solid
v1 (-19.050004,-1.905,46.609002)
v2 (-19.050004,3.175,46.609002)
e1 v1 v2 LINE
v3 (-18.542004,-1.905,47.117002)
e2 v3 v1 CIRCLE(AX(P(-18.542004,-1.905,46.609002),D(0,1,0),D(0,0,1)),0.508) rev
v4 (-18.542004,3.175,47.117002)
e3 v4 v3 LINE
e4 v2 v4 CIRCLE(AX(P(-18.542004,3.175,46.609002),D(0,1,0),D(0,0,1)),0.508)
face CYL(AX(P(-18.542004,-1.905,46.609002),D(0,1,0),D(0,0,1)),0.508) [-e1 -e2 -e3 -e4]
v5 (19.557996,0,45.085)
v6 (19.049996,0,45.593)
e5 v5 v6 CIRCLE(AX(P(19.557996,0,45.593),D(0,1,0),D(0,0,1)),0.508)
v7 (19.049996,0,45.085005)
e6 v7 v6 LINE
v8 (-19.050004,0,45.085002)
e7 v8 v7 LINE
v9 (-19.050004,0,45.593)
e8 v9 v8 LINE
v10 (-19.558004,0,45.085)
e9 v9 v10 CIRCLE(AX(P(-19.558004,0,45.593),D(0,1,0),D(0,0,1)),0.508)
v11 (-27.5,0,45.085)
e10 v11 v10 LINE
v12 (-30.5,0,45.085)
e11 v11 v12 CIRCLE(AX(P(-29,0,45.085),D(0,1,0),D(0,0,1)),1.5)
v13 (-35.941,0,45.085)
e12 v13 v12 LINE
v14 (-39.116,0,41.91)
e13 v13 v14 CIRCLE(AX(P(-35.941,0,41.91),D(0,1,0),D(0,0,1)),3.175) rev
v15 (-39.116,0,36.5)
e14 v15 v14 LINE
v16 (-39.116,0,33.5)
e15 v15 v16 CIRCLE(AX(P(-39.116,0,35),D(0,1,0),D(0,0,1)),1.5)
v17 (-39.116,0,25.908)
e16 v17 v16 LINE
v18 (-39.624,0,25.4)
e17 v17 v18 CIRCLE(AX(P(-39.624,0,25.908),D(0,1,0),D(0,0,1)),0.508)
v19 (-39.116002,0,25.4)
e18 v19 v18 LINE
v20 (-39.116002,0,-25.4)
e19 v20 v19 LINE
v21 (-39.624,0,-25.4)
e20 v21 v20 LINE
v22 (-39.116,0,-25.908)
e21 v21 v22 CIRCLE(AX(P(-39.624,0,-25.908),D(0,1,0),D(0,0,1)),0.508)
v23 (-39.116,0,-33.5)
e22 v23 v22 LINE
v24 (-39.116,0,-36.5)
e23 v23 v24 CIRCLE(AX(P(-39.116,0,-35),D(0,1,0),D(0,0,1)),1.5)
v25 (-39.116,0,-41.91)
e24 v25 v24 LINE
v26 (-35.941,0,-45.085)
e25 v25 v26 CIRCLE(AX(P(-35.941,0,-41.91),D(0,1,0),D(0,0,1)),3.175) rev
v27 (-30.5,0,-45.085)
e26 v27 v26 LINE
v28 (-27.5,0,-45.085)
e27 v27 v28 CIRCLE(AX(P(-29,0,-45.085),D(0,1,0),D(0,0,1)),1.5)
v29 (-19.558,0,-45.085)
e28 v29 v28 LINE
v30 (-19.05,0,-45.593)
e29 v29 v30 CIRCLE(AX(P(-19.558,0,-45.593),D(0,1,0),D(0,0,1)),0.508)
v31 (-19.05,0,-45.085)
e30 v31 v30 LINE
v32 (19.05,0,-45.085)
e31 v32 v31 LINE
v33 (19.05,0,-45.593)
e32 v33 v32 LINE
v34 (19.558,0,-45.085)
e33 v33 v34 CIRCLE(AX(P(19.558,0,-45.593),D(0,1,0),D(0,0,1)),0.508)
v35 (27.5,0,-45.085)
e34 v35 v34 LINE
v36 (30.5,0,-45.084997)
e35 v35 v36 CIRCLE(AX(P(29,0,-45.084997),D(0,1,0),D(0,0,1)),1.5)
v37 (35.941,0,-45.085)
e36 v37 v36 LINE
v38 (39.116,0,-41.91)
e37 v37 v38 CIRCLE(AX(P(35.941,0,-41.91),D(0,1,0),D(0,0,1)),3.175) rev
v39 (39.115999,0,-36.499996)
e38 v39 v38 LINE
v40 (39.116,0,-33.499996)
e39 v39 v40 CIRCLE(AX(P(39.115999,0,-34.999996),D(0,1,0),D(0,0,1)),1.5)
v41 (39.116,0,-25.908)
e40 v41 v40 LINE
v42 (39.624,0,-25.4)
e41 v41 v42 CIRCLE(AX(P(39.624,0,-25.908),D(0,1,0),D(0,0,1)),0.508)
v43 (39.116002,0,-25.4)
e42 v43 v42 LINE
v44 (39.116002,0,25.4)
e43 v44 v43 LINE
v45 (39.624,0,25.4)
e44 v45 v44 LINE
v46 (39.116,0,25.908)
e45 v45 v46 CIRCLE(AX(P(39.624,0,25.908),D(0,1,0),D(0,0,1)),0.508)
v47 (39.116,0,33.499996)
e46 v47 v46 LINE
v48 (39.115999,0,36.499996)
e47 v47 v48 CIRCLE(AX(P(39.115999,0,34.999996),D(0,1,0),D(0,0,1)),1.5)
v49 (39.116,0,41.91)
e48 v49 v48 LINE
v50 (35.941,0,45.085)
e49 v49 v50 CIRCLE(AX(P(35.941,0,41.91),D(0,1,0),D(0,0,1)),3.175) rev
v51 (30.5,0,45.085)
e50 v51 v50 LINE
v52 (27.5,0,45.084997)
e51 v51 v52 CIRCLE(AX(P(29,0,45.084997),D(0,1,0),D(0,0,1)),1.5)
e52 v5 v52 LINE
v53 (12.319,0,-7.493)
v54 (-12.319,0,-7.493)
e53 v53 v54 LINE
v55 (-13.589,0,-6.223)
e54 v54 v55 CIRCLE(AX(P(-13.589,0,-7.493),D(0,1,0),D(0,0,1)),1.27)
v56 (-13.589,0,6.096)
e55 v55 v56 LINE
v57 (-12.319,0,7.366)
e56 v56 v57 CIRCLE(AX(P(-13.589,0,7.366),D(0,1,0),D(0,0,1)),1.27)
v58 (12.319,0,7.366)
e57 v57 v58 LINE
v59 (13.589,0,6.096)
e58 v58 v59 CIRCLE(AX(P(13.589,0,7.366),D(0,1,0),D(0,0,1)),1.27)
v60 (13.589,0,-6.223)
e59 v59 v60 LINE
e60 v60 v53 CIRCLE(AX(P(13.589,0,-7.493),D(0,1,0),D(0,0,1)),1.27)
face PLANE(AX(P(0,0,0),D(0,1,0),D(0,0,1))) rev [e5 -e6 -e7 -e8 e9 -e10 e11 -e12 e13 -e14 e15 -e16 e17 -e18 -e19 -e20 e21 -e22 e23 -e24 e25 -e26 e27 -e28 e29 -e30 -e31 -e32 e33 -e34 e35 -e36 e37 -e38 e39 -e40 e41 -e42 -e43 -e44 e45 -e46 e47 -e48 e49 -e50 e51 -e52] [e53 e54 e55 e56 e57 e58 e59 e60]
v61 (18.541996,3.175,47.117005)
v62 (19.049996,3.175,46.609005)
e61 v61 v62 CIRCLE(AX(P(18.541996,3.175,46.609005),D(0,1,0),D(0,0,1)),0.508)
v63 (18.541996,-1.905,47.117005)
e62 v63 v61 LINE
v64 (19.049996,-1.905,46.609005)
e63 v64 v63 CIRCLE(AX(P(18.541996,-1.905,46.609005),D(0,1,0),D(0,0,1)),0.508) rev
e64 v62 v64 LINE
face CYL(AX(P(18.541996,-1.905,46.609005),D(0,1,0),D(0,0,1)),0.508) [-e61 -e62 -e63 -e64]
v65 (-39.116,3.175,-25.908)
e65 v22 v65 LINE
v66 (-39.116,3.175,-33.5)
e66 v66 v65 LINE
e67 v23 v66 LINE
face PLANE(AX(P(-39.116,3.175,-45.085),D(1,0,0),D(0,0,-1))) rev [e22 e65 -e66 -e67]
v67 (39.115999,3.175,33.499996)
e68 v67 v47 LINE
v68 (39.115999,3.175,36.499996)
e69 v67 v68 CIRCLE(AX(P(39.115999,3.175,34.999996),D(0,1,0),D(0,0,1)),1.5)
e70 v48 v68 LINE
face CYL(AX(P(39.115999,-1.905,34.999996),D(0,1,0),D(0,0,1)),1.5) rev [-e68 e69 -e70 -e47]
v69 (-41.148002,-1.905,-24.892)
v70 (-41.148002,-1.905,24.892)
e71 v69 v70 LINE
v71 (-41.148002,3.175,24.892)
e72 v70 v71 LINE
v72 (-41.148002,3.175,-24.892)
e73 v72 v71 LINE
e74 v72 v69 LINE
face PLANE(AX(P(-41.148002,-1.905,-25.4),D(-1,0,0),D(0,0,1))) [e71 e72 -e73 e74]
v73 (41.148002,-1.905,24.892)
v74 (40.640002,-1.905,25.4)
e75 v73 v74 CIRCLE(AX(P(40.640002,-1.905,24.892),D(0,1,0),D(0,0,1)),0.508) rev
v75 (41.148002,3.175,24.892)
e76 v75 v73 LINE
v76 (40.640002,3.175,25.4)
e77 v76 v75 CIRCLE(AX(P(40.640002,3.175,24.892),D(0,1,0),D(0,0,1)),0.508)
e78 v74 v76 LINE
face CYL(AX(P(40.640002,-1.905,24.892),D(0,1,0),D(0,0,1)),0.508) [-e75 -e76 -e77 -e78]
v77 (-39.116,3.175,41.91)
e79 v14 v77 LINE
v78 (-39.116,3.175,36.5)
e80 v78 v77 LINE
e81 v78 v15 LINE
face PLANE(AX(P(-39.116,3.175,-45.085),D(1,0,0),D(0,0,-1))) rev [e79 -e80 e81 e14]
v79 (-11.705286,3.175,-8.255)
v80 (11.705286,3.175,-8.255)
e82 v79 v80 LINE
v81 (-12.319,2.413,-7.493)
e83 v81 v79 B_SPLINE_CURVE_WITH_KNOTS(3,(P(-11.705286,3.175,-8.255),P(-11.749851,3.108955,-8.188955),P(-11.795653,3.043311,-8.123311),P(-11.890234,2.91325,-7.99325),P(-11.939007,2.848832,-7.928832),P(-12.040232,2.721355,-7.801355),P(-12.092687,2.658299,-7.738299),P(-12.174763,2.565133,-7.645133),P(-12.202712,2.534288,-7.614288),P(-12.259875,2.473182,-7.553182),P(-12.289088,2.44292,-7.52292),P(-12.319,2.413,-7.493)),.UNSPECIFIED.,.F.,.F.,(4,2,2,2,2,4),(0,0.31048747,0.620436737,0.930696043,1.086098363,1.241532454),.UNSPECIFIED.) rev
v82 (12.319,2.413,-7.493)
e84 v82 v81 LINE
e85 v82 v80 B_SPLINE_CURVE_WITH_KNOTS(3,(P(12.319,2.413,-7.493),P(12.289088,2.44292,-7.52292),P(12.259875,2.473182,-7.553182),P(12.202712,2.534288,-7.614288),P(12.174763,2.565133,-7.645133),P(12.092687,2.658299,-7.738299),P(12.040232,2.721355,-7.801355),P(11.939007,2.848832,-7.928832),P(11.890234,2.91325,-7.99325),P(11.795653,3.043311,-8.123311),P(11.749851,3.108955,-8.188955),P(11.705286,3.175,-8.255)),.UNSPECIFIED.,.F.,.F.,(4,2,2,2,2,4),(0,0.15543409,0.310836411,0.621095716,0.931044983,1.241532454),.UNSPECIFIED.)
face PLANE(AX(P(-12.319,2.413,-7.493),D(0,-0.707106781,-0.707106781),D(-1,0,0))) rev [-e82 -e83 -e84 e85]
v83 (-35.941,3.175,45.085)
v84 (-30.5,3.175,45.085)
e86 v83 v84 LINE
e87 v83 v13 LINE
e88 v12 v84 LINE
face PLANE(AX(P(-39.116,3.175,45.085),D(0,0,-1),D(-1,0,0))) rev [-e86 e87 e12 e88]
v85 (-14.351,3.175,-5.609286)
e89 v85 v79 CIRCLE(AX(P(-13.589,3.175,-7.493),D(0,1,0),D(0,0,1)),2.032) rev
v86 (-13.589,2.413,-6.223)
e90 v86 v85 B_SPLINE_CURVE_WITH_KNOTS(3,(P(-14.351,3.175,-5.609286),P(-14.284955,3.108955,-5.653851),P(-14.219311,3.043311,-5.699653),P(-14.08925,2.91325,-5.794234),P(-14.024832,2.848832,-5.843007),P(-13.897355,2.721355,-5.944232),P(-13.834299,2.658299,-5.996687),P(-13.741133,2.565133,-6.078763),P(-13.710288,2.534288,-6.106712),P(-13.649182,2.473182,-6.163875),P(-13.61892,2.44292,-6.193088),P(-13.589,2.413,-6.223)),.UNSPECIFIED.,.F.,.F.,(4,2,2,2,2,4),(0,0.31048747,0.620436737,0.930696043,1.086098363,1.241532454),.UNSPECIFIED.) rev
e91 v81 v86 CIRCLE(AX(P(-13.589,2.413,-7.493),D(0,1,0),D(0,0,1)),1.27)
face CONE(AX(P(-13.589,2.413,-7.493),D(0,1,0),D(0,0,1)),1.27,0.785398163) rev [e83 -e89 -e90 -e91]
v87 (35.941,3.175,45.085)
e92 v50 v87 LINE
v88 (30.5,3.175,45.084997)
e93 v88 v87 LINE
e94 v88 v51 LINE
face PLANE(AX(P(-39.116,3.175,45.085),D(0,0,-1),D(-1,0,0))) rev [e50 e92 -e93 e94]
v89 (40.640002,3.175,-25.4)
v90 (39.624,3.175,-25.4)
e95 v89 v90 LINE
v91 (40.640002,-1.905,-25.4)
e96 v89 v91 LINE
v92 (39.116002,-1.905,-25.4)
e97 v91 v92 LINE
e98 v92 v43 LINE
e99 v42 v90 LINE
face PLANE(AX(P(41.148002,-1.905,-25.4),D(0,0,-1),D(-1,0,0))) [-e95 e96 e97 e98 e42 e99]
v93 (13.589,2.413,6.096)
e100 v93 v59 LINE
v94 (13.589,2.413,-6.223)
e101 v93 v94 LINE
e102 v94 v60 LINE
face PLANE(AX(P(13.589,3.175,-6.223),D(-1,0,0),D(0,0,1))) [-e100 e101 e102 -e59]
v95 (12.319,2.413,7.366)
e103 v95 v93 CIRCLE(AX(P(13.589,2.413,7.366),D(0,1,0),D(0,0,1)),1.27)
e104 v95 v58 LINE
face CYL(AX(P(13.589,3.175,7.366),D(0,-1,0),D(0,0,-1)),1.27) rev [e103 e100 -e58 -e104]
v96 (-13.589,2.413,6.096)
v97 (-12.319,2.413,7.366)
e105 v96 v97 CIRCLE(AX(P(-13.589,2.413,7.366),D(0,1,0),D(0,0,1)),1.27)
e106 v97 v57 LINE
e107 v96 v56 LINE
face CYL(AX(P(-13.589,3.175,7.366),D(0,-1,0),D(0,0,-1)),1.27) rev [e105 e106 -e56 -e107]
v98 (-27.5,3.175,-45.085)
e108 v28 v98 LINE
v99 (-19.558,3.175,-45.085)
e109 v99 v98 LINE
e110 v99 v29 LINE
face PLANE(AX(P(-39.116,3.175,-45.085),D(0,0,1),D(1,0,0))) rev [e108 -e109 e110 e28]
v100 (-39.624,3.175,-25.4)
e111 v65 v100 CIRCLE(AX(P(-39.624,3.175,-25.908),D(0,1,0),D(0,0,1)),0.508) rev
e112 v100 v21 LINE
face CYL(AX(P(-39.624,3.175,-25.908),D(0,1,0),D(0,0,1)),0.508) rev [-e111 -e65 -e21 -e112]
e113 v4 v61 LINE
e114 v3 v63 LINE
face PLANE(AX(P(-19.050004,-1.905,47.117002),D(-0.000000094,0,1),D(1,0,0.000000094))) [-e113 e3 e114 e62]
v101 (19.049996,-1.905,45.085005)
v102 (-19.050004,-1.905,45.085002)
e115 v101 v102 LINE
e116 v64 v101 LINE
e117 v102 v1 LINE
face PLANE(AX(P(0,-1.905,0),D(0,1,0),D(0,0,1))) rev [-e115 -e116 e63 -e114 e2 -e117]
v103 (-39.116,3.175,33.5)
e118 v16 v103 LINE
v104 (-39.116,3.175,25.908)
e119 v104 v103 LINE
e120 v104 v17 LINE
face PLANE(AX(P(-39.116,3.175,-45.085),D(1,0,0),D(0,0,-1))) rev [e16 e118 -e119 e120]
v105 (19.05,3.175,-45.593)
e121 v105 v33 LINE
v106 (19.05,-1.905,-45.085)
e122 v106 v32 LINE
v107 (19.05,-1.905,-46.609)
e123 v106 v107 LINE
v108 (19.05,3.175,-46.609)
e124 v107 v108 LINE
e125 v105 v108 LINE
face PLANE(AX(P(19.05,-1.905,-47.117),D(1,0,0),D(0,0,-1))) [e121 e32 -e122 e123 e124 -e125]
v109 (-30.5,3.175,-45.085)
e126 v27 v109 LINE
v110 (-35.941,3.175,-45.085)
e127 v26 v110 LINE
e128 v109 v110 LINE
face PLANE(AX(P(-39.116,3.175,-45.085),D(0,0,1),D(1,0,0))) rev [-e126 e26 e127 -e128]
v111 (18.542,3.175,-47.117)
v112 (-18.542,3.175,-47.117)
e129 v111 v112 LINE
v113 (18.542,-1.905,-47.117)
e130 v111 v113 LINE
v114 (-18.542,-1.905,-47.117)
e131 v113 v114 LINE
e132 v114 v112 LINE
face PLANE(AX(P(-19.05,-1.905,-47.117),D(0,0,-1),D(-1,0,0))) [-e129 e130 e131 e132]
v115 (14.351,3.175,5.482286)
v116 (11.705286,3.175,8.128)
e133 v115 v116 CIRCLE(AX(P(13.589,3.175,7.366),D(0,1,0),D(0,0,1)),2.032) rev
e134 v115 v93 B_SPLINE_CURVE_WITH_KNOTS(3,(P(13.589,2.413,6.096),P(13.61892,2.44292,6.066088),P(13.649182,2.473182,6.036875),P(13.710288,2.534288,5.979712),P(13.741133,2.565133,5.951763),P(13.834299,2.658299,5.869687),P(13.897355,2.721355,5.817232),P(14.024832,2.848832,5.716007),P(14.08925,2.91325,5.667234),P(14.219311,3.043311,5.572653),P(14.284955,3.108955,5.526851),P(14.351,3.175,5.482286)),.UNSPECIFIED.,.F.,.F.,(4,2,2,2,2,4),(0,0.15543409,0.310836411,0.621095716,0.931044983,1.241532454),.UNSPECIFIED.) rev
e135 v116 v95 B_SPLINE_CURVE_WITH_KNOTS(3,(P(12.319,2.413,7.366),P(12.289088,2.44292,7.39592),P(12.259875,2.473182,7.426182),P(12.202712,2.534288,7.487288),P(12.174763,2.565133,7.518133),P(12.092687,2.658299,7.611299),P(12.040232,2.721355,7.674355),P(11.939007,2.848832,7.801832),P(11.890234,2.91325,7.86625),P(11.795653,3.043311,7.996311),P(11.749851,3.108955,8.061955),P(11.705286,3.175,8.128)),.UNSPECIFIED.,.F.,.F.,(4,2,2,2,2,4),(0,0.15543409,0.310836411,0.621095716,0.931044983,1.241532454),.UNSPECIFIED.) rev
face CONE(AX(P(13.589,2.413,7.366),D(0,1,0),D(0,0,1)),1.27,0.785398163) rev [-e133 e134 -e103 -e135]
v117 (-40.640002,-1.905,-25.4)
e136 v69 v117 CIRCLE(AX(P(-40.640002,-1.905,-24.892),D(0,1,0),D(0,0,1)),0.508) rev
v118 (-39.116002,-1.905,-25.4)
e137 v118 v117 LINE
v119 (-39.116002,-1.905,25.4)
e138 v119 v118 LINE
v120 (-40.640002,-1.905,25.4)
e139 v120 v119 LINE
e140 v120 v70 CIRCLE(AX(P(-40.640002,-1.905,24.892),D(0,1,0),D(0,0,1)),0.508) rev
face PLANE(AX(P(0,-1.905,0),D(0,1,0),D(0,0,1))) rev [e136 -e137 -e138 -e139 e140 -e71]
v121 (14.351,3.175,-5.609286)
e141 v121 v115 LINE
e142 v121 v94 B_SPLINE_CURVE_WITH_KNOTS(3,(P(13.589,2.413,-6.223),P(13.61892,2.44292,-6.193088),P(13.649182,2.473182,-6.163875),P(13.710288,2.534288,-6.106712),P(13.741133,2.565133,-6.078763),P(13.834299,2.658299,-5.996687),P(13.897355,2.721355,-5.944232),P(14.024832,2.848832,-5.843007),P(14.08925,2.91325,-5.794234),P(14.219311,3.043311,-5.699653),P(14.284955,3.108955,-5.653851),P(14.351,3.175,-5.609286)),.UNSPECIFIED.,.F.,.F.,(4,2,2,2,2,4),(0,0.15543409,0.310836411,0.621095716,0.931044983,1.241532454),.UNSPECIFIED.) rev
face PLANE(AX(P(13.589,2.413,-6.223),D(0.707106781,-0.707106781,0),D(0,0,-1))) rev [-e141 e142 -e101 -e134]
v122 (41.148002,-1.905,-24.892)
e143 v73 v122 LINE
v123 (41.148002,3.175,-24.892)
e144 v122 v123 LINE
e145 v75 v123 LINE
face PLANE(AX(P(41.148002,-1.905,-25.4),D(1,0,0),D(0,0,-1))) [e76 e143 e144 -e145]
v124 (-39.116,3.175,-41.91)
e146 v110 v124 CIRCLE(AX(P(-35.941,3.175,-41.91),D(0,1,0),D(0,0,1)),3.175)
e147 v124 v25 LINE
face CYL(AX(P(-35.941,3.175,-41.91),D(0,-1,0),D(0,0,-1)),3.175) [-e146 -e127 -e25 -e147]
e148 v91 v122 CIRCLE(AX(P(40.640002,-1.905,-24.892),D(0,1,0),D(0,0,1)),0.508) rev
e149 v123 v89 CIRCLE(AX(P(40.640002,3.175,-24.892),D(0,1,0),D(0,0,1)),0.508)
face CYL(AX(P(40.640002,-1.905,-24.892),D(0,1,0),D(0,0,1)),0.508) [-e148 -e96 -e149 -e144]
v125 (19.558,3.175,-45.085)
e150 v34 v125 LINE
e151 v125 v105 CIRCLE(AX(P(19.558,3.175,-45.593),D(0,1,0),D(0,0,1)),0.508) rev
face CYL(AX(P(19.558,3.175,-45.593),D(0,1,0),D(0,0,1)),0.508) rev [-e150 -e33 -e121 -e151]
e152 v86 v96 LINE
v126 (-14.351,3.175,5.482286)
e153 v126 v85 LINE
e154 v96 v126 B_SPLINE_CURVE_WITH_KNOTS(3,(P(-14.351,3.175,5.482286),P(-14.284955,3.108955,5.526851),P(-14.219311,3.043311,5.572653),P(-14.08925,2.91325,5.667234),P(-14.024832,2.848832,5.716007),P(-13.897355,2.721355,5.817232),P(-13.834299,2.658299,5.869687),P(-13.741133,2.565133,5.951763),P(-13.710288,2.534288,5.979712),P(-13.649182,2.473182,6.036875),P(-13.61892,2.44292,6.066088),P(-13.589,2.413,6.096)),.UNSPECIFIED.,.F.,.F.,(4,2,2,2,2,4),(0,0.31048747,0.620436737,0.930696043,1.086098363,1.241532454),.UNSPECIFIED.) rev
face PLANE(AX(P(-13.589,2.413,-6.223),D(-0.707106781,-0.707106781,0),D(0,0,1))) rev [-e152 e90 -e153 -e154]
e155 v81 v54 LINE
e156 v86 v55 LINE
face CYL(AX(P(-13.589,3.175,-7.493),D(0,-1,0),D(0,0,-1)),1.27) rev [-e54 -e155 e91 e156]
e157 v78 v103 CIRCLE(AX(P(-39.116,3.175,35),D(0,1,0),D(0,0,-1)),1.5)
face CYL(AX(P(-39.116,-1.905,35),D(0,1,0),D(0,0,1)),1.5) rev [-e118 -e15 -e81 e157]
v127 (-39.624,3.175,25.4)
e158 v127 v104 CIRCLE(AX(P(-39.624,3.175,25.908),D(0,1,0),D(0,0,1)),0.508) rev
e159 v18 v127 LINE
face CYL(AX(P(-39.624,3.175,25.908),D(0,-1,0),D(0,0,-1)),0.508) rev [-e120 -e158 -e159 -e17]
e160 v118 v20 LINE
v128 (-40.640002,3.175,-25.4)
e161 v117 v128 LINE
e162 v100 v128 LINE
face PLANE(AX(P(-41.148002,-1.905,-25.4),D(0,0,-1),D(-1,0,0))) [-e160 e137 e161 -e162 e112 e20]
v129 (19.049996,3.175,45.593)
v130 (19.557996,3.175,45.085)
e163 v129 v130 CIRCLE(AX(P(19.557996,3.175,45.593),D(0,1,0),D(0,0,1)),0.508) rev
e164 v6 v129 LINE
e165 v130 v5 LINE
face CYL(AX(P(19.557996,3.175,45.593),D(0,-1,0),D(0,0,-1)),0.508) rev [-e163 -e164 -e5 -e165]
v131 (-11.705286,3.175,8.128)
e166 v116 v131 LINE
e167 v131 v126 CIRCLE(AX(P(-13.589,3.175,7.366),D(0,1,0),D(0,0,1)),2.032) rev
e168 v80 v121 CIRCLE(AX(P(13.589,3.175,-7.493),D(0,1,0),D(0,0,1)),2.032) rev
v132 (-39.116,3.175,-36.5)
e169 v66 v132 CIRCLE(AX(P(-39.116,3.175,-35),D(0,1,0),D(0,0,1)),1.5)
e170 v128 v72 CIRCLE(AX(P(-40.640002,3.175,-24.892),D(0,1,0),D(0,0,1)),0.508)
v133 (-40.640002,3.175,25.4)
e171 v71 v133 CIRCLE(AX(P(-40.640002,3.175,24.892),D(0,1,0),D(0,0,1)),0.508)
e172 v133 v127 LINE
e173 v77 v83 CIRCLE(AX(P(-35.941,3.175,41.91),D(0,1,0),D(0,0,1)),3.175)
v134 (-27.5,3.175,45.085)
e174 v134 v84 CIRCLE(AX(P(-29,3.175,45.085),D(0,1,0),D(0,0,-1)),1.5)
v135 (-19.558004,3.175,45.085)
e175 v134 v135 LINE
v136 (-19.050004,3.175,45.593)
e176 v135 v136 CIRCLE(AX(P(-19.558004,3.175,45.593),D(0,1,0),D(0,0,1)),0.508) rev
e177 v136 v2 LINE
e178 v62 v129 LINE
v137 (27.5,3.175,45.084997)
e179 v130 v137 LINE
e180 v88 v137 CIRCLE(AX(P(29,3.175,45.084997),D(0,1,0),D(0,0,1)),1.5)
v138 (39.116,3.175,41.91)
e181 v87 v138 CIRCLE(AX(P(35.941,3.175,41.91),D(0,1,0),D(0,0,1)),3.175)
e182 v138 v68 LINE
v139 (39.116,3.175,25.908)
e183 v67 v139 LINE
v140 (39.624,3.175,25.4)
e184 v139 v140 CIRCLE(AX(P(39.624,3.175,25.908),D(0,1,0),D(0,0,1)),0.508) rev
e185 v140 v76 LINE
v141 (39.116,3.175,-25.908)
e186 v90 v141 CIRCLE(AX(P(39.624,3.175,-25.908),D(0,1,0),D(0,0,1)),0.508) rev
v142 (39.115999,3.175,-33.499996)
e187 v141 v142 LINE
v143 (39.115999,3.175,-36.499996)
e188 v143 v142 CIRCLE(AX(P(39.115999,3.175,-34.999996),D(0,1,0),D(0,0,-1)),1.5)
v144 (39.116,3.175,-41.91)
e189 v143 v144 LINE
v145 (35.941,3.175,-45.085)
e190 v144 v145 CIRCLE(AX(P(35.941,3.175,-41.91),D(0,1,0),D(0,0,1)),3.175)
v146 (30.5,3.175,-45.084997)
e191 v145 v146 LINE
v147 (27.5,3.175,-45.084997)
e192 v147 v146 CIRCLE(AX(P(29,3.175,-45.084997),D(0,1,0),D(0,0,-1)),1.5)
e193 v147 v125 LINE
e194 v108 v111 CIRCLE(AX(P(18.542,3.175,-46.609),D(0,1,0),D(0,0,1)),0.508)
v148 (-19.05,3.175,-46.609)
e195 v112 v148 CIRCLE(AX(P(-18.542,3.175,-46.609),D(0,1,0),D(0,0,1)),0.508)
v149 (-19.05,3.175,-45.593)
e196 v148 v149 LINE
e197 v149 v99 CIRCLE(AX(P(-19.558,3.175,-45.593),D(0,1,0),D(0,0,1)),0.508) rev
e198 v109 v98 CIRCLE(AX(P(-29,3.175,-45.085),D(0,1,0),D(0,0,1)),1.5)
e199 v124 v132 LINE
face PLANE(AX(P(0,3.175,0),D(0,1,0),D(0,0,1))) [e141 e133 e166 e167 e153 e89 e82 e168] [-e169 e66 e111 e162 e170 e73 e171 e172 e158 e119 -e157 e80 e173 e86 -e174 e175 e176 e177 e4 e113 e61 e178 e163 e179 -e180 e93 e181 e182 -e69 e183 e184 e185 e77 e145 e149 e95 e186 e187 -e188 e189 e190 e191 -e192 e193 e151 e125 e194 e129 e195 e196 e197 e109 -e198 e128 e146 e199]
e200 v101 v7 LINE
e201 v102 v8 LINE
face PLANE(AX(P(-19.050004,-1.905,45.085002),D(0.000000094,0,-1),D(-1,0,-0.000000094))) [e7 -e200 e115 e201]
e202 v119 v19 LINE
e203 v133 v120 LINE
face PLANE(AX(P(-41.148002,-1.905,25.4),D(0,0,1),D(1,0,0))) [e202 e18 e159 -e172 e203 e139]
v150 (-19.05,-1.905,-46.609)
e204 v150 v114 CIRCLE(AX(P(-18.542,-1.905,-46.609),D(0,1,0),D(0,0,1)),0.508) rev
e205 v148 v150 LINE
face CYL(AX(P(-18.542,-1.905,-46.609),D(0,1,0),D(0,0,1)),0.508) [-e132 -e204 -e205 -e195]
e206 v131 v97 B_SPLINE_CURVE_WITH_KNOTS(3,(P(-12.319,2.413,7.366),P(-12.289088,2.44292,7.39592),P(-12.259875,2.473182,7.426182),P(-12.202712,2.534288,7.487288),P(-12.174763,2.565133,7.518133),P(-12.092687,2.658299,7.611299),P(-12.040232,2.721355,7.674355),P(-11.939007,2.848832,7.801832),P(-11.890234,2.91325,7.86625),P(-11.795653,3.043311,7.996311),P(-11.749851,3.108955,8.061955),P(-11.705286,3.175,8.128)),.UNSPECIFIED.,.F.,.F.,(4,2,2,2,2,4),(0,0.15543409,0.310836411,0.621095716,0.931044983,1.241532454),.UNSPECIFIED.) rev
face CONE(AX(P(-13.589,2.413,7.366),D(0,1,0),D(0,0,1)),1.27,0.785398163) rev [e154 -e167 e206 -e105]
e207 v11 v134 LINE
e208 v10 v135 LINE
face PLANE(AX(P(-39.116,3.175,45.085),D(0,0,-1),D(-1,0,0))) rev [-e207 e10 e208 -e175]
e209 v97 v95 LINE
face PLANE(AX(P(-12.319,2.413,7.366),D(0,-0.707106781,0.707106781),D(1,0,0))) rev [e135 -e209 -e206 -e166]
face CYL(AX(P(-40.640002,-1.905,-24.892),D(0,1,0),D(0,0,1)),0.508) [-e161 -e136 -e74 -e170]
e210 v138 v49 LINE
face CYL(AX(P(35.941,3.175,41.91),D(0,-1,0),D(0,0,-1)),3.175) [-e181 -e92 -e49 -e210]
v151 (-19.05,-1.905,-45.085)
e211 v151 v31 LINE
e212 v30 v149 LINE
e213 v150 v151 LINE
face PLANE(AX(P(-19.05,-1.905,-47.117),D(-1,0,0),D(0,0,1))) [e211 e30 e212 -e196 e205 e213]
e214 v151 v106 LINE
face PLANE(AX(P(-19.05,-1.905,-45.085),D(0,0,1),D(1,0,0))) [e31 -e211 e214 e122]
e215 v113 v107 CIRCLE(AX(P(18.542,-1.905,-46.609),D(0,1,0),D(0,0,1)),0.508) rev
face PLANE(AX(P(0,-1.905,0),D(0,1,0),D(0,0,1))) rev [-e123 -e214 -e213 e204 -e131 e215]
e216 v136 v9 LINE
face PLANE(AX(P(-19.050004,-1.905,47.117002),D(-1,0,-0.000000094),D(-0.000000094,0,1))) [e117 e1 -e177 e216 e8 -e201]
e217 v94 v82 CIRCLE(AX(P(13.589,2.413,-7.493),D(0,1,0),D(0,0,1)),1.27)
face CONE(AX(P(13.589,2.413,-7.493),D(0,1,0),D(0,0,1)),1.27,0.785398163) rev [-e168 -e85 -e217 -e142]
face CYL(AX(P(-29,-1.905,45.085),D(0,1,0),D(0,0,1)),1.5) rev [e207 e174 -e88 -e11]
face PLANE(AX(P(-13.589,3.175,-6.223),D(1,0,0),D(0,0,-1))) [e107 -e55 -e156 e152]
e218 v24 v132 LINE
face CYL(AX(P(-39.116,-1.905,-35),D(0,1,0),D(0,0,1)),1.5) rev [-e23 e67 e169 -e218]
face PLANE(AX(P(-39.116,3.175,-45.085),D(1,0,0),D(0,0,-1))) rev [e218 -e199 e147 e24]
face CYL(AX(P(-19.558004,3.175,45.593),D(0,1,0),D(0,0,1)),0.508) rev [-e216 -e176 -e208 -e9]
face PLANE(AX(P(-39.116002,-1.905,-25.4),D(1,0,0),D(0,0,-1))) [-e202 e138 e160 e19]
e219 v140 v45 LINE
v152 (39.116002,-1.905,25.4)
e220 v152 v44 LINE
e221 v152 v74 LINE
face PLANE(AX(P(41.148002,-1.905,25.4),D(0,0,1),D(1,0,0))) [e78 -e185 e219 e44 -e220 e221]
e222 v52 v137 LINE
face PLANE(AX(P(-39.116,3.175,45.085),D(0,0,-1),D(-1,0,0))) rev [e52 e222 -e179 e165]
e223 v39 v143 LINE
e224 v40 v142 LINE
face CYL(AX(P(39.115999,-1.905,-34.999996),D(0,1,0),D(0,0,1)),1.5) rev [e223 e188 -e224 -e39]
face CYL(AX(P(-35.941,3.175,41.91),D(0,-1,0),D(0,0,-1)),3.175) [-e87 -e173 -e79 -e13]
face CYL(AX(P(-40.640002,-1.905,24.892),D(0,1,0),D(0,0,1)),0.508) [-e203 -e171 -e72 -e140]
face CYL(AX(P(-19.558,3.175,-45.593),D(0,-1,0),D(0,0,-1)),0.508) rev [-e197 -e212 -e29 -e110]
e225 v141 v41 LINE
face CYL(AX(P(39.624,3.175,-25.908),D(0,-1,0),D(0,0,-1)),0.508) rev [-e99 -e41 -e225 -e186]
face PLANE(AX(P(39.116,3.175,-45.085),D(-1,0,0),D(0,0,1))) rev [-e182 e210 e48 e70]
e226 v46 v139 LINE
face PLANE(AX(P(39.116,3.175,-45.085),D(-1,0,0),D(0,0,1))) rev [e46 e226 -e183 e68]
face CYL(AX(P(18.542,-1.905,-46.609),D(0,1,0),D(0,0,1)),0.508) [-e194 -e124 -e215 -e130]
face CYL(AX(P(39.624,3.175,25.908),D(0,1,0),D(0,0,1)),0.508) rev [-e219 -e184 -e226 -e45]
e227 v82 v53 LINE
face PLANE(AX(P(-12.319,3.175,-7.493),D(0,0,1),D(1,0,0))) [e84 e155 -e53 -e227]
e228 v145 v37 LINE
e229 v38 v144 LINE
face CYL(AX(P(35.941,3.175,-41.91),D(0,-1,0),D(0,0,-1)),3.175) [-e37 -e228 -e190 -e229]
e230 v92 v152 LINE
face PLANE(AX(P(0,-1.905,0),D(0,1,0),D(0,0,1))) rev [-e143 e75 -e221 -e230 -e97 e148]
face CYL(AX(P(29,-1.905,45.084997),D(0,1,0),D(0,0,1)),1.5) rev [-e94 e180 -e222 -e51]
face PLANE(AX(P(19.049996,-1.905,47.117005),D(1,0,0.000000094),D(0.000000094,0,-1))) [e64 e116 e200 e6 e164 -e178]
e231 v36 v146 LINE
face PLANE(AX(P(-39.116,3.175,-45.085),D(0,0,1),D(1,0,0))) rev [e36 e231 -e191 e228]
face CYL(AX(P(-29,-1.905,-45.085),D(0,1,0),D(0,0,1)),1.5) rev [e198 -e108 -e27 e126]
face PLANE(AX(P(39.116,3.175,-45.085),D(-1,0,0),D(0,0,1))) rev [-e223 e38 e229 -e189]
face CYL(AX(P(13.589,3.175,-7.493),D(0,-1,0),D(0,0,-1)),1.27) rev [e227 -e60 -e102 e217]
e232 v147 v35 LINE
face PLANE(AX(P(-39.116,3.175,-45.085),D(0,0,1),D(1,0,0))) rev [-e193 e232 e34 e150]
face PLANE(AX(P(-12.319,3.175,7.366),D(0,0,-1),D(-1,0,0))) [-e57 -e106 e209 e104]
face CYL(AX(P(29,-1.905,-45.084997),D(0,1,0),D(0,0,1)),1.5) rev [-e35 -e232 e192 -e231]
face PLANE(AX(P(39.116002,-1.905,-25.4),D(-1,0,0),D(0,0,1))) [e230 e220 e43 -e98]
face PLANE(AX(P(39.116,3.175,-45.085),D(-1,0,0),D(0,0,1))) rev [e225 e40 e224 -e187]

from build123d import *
from OCP.BRepAlgoAPI import BRepAlgoAPI_Cut
from OCP.TopTools import TopTools_ListOfShape

# Parameters (mm, degrees)
SKETCH1_W           = 78.232
SKETCH1_H           = 90.17
BOSS_EXTRUDE1_DEPTH = 3.175
FILLET1_R           = 3.175
SKETCH2_W           = 2.032
SKETCH2_H           = 50.8
SKETCH2_W_2         = 38.1
SKETCH2_H_2         = 2.032
BOSS_EXTRUDE2_DEPTH = 5.08
FILLET3_R           = 0.508
CUT_EXTRUDE1_DEPTH  = 63.761267046
CHAMFER2_SIZE       = 0.762


with BuildPart() as part:
    # Sketch1 → Boss-Extrude1 (new body)
    with BuildSketch(Plane(origin=(0, 0, 0), x_dir=(1, 0, 0), z_dir=(0, 1, 0))):
        Rectangle(SKETCH1_W, SKETCH1_H)
        with BuildLine():
            Line((-12.319, 7.493), (12.319, 7.493))
            ThreePointArc((12.319, 7.493), (14.487025612, 8.391025612), (13.589, 6.223))
            Line((13.589, 6.223), (13.589, -6.096))
            ThreePointArc((13.589, -6.096), (14.487025612, -8.264025612), (12.319, -7.366))
            Line((12.319, -7.366), (-12.319, -7.366))
            ThreePointArc((-12.319, -7.366), (-14.487025612, -8.264025612), (-13.589, -6.096))
            Line((-13.589, -6.096), (-13.589, 6.223))
            ThreePointArc((-13.589, 6.223), (-14.487025612, 8.391025612), (-12.319, 7.493))
        make_face(mode=Mode.SUBTRACT)
    extrude(amount=BOSS_EXTRUDE1_DEPTH)

    # Fillet1
    fillet1_edges = [part.edges().sort_by_distance(p)[0] for p in [
        (-39.116, 1.5875, -45.085),
        (39.116, 1.5875, -45.085),
        (39.116, 1.5875, 45.085),
        (-39.116, 1.5875, 45.085),
    ]]
    fillet(fillet1_edges, radius=FILLET1_R)


with BuildPart() as boss_extrude2_tool:
    # Sketch2 → Boss-Extrude2 (new body)
    with BuildSketch(Plane(origin=(0, 3.175, 0), x_dir=(1, 0, 0), z_dir=(0, 1, 0))):
        Polygon((19.049995564, -47.117005476), (19.049995755, -45.085005476), (-19.050004245, -45.085001889), (-19.050004436, -47.117001889), align=None)
        with Locations((-40.132001661, 0)):
            Rectangle(SKETCH2_W, SKETCH2_H)
        with Locations((0, 46.101)):
            Rectangle(SKETCH2_W_2, SKETCH2_H_2)
        with Locations((40.132001661, 0)):
            Rectangle(SKETCH2_W, SKETCH2_H)
    extrude(amount=-BOSS_EXTRUDE2_DEPTH)


with BuildPart() as part_1:
    add(part.part)


with BuildPart() as part_2:
    # Boss-Extrude2: joined with boss_extrude2_tool
    add(part_1.part.fuse(boss_extrude2_tool.part, tol=0.00001))

    # Fillet3
    fillet3_edges = [part_2.edges().sort_by_distance(p)[0] for p in [
        (19.05, 1.5875, -45.085),
        (-19.05, 1.5875, -45.085),
        (-19.05, 0.635, -47.117),
        (19.05, 0.635, -47.117),
        (-39.116001661, 1.5875, 25.4),
        (-39.116001661, 1.5875, -25.4),
        (-41.148001661, 0.635, 25.4),
        (-41.148001661, 0.635, -25.4),
        (39.116001661, 1.5875, 25.4),
        (39.116001661, 1.5875, -25.4),
        (41.148001661, 0.635, -25.4),
        (41.148001661, 0.635, 25.4),
        (19.049995755, 1.5875, 45.085005476),
        (-19.050004245, 1.5875, 45.085001889),
        (19.049995564, 0.635, 47.117005476),
        (-19.050004436, 0.635, 47.117001889),
    ]]
    fillet(fillet3_edges, radius=FILLET3_R)


with BuildPart() as cut_extrude1_tool:
    # Sketch3 → Cut-Extrude1 (new, through all)
    with BuildSketch(Plane(origin=(0, 3.175, 0), x_dir=(1, 0, 0), z_dir=(0, 1, 0))):
        with BuildLine():
            Line((-39.116, 36.5), (-39.116, 33.5))
            ThreePointArc((-39.116, 33.5), (-37.616, 35), (-39.116, 36.5))
        make_face()
        with BuildLine():
            Line((-27.5, 45.085), (-30.5, 45.085))
            ThreePointArc((-30.5, 45.085), (-29, 43.585), (-27.5, 45.085))
        make_face()
        with BuildLine():
            Line((27.499999809, 45.084997268), (30.499999809, 45.084997268))
            ThreePointArc((30.499999809, 45.084997268), (28.999999809, 43.584997268), (27.499999809, 45.084997268))
        make_face()
        with BuildLine():
            Line((39.115998859, 36.499996315), (39.115998859, 33.499996315))
            ThreePointArc((39.115998859, 33.499996315), (37.615998859, 34.999996315), (39.115998859, 36.499996315))
        make_face()
        with BuildLine():
            Line((39.115998859, -33.499996315), (39.115998859, -36.499996315))
            ThreePointArc((39.115998859, -36.499996315), (37.615998859, -34.999996315), (39.115998859, -33.499996315))
        make_face()
        with BuildLine():
            Line((30.499999809, -45.084997268), (27.499999809, -45.084997268))
            ThreePointArc((27.499999809, -45.084997268), (28.999999809, -43.584997268), (30.499999809, -45.084997268))
        make_face()
        with BuildLine():
            Line((-27.5, -45.085), (-30.5, -45.085))
            ThreePointArc((-30.5, -45.085), (-29, -43.585), (-27.5, -45.085))
        make_face()
        with BuildLine():
            Line((-39.116, -36.5), (-39.116, -33.5))
            ThreePointArc((-39.116, -33.5), (-37.616, -35), (-39.116, -36.5))
        make_face()
    extrude(amount=-CUT_EXTRUDE1_DEPTH)


with BuildPart() as part_3:
    add(part_2.part)

    # Cut-Extrude1: cut by cut_extrude1_tool, with a tolerance
    cut_extrude1_stock = TopTools_ListOfShape()
    cut_extrude1_stock.Append(part_3.part.wrapped)
    cut_extrude1_tools = TopTools_ListOfShape()
    cut_extrude1_tools.Append(cut_extrude1_tool.part.wrapped)
    cut_extrude1_cut = BRepAlgoAPI_Cut()
    cut_extrude1_cut.SetArguments(cut_extrude1_stock)
    cut_extrude1_cut.SetTools(cut_extrude1_tools)
    cut_extrude1_cut.SetFuzzyValue(0.00001)
    cut_extrude1_cut.Build()
    add(Compound.cast(cut_extrude1_cut.Shape()).solids(), mode=Mode.REPLACE)

    # Chamfer2
    chamfer2_edges = [part_3.edges().sort_by_distance(p)[0] for p in [
        (-14.487025612, 3.175, -8.391025612),
        (-13.589, 3.175, -0.0635),
        (-14.487025612, 3.175, 8.264025612),
        (0, 3.175, 7.366),
        (14.487025612, 3.175, 8.264025612),
        (13.589, 3.175, -0.0635),
        (14.487025612, 3.175, -8.391025612),
        (0, 3.175, -7.493),
    ]]
    chamfer(chamfer2_edges, length=CHAMFER2_SIZE)


solid = part_3.part
